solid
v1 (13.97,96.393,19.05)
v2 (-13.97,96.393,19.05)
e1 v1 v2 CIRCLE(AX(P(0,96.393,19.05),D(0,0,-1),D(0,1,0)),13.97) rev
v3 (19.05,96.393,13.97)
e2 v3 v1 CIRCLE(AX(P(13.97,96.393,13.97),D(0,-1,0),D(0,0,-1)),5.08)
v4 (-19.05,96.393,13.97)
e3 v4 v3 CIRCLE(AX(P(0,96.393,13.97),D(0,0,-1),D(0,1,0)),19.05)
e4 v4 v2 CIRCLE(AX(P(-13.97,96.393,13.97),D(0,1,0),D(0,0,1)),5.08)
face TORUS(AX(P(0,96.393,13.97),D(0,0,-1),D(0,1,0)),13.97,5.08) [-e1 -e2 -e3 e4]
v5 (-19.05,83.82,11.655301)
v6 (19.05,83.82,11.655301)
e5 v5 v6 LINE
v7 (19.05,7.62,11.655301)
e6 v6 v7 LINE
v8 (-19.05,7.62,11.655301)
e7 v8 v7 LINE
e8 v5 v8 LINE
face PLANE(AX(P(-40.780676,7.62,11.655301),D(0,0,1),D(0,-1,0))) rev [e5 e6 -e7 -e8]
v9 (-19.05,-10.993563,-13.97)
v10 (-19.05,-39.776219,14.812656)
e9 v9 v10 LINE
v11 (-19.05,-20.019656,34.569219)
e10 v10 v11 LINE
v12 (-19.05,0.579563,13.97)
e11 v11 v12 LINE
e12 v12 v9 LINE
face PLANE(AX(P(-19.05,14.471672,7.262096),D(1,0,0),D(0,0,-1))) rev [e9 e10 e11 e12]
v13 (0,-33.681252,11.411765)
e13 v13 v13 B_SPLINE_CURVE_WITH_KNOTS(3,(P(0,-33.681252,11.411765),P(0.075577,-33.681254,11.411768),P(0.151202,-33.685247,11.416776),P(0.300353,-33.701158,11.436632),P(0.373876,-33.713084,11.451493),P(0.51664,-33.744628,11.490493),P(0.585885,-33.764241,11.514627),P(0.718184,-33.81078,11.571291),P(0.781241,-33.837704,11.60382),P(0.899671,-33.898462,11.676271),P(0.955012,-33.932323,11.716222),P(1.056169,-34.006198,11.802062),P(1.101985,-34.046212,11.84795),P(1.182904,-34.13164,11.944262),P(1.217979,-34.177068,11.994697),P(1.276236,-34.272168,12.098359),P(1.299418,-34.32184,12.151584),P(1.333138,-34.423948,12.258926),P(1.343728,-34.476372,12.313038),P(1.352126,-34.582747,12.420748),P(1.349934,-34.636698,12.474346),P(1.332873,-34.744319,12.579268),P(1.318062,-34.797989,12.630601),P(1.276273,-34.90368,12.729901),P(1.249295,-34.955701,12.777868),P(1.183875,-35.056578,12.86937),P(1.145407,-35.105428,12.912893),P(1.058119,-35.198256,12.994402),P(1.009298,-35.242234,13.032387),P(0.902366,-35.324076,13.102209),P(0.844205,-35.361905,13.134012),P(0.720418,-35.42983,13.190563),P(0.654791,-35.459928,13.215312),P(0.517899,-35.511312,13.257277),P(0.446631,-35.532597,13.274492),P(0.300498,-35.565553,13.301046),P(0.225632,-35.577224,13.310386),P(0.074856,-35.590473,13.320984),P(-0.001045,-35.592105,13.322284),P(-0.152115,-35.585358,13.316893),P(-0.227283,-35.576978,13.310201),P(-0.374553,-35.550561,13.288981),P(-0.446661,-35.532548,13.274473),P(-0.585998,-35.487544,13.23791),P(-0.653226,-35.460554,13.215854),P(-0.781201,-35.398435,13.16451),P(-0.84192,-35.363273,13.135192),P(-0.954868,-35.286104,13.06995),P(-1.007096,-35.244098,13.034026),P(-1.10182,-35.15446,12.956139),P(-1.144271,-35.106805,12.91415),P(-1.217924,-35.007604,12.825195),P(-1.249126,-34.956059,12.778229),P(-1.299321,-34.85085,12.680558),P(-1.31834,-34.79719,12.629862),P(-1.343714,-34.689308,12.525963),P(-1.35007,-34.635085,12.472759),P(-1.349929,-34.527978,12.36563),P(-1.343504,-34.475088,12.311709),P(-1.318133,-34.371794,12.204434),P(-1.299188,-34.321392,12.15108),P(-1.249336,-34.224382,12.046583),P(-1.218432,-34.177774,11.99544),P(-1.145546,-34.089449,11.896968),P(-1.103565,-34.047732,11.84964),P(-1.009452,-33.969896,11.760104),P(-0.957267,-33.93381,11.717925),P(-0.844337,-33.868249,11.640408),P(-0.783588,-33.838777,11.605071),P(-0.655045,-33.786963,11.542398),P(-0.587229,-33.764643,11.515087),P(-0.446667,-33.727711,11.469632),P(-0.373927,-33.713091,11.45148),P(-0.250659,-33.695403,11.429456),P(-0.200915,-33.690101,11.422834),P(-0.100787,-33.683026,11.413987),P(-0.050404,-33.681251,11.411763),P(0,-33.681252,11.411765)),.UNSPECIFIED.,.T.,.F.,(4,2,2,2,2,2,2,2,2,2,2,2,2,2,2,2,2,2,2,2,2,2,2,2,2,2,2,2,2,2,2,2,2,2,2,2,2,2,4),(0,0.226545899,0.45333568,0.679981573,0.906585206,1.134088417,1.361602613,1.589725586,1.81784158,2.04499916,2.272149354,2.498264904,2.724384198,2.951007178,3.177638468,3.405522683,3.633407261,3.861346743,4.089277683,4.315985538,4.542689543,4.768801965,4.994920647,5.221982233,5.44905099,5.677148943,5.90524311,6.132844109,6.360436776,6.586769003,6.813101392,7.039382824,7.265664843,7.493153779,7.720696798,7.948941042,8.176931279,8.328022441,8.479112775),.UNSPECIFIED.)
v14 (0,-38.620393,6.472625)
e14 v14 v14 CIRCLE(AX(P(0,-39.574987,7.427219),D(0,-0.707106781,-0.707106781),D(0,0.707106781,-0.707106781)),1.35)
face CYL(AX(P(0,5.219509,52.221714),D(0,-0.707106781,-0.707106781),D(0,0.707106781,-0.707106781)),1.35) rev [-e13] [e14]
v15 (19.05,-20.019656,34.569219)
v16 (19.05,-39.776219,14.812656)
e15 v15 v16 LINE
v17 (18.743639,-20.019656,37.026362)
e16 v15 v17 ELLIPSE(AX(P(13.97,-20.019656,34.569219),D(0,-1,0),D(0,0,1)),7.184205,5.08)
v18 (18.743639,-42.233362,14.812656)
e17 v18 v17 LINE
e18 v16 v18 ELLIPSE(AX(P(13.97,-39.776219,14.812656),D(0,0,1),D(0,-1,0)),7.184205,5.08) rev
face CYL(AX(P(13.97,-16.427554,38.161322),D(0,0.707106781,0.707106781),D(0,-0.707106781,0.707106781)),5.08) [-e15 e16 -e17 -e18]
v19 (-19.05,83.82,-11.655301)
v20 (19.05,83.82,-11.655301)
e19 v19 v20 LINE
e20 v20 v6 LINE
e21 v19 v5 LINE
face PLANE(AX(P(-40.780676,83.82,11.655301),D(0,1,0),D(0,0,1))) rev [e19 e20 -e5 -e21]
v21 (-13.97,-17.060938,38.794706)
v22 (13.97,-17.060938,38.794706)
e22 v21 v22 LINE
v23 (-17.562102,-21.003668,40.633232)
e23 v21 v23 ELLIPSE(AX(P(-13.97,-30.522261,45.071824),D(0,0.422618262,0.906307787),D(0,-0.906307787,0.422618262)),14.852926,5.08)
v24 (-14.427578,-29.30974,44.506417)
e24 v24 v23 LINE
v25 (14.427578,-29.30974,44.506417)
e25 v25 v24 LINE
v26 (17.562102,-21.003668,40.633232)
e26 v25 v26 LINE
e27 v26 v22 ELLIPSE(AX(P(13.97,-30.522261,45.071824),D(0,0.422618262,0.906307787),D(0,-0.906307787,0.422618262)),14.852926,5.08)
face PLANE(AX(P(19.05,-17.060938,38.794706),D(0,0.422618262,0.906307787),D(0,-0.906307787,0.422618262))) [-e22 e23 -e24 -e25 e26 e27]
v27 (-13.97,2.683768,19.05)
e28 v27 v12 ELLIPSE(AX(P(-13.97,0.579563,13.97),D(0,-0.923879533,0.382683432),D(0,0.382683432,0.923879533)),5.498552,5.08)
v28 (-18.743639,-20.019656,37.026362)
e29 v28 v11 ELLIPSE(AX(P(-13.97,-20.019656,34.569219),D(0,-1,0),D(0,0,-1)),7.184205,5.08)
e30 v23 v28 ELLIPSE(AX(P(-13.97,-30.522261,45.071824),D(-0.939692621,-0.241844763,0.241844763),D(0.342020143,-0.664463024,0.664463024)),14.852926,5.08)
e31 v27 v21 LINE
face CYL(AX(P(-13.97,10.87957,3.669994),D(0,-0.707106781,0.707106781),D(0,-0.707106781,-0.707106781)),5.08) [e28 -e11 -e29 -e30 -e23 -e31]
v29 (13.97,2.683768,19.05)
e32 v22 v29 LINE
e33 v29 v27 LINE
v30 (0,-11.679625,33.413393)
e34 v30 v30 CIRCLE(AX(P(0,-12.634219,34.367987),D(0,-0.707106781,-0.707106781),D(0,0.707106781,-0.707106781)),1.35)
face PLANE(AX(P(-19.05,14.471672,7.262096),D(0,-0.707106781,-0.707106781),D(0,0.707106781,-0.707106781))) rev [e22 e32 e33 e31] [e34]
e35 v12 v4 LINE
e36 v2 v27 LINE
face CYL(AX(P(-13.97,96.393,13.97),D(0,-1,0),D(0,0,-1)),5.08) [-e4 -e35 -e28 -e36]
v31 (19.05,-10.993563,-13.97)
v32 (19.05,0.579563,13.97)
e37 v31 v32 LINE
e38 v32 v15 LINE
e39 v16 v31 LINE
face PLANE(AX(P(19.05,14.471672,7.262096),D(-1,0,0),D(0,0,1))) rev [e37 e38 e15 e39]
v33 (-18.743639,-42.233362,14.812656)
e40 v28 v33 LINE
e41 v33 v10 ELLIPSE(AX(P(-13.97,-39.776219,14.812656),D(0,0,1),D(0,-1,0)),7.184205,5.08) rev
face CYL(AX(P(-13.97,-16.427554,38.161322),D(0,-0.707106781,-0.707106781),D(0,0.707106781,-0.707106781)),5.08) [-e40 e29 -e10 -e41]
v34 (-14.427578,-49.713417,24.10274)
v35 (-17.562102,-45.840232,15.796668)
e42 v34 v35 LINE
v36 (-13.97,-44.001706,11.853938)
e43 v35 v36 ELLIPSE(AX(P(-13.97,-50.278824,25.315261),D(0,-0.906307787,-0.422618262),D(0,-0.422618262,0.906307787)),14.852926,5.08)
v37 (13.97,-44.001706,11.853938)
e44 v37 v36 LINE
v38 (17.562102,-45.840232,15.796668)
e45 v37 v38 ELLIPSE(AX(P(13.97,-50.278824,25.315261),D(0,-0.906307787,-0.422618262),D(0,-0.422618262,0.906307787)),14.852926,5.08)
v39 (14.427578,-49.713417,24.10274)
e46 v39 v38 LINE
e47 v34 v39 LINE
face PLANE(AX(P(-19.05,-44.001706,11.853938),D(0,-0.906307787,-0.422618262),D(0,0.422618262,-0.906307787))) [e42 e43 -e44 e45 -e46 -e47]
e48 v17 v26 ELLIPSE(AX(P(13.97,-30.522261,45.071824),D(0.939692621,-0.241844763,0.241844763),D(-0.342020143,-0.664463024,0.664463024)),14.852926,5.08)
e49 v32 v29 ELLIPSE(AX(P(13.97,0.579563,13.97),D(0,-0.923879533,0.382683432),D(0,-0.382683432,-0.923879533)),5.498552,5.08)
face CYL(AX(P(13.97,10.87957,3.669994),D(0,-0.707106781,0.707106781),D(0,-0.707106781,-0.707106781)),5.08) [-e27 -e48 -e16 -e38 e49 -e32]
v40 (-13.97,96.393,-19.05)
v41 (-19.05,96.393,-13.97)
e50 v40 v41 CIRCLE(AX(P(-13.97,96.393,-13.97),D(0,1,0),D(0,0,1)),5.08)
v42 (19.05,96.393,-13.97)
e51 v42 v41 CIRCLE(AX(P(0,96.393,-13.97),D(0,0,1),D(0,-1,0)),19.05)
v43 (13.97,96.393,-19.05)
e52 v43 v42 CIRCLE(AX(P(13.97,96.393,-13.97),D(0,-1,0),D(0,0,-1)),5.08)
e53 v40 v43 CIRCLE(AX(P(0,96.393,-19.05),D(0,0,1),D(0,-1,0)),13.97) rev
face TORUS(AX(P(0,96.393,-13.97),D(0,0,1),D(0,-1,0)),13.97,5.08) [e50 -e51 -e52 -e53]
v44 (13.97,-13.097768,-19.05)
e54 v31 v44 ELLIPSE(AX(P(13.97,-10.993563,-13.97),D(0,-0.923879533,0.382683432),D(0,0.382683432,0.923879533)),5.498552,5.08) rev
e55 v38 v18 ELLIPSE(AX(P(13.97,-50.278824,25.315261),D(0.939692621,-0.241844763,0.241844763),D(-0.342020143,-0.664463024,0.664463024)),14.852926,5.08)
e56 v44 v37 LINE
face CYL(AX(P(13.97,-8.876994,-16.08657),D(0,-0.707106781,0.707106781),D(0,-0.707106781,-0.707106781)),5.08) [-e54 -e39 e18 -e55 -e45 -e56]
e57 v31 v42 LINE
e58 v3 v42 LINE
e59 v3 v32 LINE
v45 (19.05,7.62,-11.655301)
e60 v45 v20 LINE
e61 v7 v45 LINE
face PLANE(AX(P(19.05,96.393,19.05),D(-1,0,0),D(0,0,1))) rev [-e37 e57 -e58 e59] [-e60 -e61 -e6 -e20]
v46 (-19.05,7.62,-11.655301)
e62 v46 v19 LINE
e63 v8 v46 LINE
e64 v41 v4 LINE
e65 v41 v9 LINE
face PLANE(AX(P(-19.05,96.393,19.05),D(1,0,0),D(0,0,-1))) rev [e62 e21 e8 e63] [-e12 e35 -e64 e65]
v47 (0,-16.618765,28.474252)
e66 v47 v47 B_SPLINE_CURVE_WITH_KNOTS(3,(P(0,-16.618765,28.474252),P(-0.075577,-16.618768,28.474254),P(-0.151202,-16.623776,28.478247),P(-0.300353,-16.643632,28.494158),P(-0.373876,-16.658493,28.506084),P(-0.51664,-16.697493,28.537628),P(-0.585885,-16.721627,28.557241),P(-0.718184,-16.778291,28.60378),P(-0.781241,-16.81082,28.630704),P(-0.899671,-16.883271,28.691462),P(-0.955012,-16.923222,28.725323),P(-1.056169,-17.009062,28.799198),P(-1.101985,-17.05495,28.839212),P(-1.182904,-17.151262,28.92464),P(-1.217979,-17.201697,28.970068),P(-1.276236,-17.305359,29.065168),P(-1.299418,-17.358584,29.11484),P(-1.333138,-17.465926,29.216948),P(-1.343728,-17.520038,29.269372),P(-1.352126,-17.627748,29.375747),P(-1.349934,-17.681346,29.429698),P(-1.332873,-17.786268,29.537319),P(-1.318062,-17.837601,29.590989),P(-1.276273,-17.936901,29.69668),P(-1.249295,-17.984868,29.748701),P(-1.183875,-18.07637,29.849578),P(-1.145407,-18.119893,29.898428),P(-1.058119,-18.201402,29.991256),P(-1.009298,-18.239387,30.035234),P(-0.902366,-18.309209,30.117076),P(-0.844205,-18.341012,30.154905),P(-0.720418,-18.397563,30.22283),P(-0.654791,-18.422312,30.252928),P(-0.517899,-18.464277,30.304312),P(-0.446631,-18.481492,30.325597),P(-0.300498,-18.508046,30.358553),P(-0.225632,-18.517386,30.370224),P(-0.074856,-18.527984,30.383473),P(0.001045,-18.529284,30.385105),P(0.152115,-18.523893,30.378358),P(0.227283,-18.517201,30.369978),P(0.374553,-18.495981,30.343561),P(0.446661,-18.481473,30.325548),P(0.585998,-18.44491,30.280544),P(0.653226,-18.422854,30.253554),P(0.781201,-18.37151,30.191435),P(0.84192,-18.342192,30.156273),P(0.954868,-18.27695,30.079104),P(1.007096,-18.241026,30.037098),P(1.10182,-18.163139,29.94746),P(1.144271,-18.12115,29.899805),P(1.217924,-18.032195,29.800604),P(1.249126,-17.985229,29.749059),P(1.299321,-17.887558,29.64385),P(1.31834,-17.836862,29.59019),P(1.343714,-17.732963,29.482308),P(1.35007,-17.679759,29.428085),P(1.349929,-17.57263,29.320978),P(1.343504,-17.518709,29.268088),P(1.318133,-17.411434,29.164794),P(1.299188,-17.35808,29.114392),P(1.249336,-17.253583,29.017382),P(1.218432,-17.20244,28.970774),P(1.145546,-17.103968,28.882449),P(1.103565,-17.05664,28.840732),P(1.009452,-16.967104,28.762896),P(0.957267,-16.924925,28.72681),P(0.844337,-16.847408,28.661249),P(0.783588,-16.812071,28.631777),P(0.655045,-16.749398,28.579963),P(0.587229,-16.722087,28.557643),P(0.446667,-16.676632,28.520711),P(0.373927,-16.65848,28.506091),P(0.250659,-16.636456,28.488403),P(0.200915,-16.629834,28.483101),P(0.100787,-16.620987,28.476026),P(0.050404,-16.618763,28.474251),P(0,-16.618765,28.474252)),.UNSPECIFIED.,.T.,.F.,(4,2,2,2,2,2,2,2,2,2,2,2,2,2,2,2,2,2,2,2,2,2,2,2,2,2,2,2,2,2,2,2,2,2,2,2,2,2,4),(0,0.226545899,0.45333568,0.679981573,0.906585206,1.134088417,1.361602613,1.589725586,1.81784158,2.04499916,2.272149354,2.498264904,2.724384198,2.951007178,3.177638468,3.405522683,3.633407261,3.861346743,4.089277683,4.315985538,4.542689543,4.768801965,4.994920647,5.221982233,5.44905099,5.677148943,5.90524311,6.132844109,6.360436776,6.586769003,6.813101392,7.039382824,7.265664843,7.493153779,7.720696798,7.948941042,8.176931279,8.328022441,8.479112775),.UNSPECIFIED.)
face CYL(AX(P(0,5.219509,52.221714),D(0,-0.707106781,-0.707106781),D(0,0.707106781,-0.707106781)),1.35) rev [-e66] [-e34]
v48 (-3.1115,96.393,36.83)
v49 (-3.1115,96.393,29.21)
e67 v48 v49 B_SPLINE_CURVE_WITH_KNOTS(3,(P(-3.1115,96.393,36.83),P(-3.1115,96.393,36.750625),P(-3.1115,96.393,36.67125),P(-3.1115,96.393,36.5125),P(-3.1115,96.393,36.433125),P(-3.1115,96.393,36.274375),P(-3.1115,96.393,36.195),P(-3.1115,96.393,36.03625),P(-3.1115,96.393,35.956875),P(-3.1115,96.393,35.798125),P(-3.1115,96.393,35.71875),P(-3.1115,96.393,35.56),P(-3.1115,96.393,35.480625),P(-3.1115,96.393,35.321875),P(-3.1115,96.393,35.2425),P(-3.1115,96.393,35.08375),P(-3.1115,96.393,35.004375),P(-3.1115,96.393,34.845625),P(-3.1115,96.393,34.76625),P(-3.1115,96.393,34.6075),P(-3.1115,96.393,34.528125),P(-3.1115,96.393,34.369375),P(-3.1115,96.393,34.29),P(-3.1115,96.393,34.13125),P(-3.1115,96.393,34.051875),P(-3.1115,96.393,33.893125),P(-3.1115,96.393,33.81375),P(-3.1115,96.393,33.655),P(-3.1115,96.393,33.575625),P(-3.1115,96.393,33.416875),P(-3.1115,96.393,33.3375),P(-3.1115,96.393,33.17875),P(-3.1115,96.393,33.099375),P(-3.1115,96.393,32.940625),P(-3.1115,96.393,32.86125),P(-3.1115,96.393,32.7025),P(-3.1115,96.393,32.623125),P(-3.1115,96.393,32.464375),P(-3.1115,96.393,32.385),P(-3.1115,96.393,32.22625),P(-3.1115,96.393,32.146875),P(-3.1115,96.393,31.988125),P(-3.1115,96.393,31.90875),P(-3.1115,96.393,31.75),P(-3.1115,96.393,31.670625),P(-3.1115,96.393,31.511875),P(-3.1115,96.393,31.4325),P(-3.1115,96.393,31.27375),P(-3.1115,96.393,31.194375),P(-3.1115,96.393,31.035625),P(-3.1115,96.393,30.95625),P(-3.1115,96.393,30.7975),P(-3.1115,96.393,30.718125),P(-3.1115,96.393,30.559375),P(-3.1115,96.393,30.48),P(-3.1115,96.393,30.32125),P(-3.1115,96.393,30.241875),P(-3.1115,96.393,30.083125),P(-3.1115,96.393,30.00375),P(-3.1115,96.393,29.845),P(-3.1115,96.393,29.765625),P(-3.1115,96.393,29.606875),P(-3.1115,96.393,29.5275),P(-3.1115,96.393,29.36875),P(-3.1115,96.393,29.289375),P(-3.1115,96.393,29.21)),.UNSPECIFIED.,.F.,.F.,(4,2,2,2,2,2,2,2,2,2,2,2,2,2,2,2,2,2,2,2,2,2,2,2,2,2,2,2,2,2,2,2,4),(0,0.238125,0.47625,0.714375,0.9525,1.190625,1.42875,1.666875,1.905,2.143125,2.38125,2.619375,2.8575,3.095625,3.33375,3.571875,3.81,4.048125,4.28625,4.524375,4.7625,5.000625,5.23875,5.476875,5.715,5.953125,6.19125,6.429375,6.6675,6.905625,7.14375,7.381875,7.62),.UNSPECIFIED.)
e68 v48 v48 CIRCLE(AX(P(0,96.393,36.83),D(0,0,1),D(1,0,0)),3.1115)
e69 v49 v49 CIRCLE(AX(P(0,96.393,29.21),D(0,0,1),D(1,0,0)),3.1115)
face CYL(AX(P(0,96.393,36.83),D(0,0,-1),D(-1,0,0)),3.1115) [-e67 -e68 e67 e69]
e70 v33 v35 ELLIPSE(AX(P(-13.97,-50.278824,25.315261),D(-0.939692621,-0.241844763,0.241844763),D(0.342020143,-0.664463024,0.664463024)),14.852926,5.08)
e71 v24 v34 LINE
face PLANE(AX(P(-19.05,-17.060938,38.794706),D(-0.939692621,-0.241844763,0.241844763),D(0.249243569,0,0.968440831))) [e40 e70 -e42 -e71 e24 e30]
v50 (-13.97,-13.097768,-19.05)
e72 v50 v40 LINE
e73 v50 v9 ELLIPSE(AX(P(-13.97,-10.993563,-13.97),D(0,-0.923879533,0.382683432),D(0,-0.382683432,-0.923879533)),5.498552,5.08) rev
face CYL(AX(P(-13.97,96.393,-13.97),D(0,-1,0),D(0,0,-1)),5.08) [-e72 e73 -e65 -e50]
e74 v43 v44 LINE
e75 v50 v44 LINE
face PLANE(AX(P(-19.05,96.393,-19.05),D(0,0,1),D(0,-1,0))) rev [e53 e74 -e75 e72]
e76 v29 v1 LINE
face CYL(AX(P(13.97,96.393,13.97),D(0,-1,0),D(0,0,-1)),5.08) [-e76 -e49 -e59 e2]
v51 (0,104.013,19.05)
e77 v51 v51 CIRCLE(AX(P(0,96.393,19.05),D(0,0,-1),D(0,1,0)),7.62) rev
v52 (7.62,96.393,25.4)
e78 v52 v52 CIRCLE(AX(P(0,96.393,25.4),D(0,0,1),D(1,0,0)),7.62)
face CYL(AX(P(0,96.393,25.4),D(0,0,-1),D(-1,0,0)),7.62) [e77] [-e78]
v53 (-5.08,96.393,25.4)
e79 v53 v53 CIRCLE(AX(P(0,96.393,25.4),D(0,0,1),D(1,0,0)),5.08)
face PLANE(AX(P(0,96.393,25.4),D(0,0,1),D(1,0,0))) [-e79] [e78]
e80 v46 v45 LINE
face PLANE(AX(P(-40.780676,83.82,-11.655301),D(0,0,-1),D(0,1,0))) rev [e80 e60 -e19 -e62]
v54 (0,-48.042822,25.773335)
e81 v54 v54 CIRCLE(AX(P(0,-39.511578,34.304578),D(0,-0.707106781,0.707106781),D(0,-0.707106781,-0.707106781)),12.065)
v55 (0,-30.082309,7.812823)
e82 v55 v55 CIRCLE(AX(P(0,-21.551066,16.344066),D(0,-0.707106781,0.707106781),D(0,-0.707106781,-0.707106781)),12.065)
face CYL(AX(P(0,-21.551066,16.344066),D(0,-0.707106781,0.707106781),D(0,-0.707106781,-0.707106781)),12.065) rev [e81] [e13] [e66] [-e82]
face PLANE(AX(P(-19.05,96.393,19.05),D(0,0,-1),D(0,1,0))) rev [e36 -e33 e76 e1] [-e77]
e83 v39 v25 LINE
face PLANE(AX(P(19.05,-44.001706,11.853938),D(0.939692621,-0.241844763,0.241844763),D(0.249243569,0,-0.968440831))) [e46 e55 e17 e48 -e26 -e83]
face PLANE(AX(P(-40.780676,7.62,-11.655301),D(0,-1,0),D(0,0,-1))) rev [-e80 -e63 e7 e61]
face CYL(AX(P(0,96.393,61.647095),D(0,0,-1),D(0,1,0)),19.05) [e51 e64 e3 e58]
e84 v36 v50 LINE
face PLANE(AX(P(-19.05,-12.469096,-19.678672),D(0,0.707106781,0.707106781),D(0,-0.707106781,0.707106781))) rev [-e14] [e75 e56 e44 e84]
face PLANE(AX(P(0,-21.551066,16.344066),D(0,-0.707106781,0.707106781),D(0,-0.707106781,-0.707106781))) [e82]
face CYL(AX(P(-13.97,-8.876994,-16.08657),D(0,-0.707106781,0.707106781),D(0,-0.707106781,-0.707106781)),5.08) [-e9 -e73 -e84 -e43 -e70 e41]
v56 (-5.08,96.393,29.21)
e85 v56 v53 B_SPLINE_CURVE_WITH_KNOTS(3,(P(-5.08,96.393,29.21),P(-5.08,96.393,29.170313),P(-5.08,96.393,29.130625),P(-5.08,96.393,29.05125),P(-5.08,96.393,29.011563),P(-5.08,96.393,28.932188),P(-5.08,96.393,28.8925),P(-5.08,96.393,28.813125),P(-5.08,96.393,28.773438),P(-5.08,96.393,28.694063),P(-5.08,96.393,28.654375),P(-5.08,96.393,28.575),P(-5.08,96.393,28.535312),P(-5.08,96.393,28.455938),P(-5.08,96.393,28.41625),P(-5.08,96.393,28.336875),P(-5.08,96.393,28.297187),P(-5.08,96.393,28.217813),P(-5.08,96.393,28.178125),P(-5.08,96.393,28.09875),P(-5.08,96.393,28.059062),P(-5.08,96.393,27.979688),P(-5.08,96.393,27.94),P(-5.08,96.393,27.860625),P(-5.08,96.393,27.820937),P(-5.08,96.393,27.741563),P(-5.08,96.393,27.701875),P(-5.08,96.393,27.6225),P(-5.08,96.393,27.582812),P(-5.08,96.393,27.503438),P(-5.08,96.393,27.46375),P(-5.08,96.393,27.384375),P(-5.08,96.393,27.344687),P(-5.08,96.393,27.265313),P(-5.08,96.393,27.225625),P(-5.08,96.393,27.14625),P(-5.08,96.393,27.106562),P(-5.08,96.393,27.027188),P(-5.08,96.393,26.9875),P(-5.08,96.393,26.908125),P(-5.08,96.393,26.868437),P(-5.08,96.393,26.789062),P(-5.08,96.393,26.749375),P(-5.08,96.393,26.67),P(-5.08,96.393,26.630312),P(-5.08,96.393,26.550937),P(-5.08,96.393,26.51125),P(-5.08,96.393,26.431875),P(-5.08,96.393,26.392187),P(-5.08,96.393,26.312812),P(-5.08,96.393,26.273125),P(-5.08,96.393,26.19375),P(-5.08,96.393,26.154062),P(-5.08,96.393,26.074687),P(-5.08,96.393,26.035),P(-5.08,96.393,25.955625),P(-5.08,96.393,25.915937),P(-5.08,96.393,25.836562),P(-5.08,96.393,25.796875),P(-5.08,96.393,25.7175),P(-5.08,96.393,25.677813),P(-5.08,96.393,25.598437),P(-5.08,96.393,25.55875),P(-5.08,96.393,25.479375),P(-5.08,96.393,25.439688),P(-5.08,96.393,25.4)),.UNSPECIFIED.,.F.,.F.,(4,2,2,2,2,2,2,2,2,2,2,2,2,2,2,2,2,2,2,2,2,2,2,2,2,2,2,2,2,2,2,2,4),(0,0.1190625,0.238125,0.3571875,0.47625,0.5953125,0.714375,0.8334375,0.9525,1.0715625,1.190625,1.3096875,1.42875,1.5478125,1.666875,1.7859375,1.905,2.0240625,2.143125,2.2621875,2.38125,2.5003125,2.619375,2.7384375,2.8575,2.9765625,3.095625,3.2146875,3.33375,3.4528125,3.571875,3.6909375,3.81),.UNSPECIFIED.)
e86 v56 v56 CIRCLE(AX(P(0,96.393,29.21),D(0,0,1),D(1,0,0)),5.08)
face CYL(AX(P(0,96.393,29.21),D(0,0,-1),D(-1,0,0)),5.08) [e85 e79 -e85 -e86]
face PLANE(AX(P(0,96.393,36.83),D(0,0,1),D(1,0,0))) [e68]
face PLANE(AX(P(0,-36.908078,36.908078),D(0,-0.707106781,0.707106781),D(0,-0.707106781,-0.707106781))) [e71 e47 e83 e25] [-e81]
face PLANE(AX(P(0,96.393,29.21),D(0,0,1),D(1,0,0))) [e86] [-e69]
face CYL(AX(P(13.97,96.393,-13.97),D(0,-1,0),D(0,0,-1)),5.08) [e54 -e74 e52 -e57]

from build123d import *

# Parameters (mm, degrees)
SKETCH11_W          = 38.1
SKETCH11_H          = 38.1
SKETCH12_W          = 38.1
SKETCH12_H          = 38.1
BOSS_EXTRUDE5_DEPTH = 12.7
BOSS_EXTRUDE5_TAPER = 20
BOSS_EXTRUDE6_DEPTH = 38.1
SKETCH15_R          = 12.065
CUT_EXTRUDE3_DEPTH  = 25.4
SKETCH16_W          = 23.310601064
SKETCH16_H          = 76.2
CUT_EXTRUDE4_DEPTH  = 59.830675793
SKETCH17_R          = 7.62
BOSS_EXTRUDE7_DEPTH = 6.35
SKETCH18_R          = 5.08
BOSS_EXTRUDE8_DEPTH = 3.81
SKETCH19_R          = 3.1115
BOSS_EXTRUDE9_DEPTH = 7.62
FILLET2_R           = 5.08
SKETCH21_R          = 1.35
CUT_EXTRUDE5_DEPTH  = 63.348983198


with BuildPart() as part:
    # Sweep1: sweep along a path in Sketch10
    with BuildLine(Plane(origin=(0, 0, 0), x_dir=(0, 0, -1), z_dir=(1, 0, 0))) as sweep1_path:
        Line((0, 96.393), (0, -5.207))
        Line((0, -5.207), (-25.324322261, -30.531322261))
    # Sketch11 → Sweep1 (sweep)
    with BuildSketch(Plane(origin=(0, 96.393, 0), x_dir=(1, 0, 0), z_dir=(0, 1, 0))):
        Rectangle(SKETCH11_W, SKETCH11_H)
    sweep(path=sweep1_path.line, transition=Transition.RIGHT)

    # Sketch12 → Boss-Extrude5 (add)
    with BuildSketch(Plane(origin=(0, -27.927822261, 27.927822261), x_dir=(1, 0, 0), z_dir=(0, -0.7071067811865461, 0.7071067811865489))):
        with Locations((0, -3.68190501)):
            Rectangle(SKETCH12_W, SKETCH12_H)
    extrude(amount=BOSS_EXTRUDE5_DEPTH, taper=BOSS_EXTRUDE5_TAPER)

    # Sketch13 → Boss-Extrude6 (add)
    with BuildSketch(Plane(origin=(0, 0, -19.05), x_dir=(-1, 0, 0), z_dir=(0, 0, -1))):
        with BuildLine():
            Line((-19.05, 96.393), (19.05, 96.393))
            ThreePointArc((19.05, 96.393), (0, 115.443), (-19.05, 96.393))
        make_face()
    extrude(amount=-BOSS_EXTRUDE6_DEPTH)

    # Sketch15 → Cut-Extrude3 (cut)
    with BuildSketch(Plane(origin=(0, -36.908078382, 36.908078382), x_dir=(1, 0, 0), z_dir=(0, -0.7071067811865461, 0.7071067811865489))):
        with Locations(Location((0, -3.68190501, 0), (0, 0, 270))):
            Circle(SKETCH15_R)
    extrude(amount=-CUT_EXTRUDE3_DEPTH, mode=Mode.SUBTRACT)

    # Sketch16 → Cut-Extrude4 (cut)
    with BuildSketch(Plane(origin=(19.05, 0, 0), x_dir=(0, 0, -1), z_dir=(1, 0, 0))):
        with Locations((0, 45.72)):
            Rectangle(SKETCH16_W, SKETCH16_H)
    extrude(amount=-CUT_EXTRUDE4_DEPTH, mode=Mode.SUBTRACT)

    # Sketch17 → Boss-Extrude7 (add)
    with BuildSketch(Plane.XY.offset(19.05)):
        with Locations(Location((0, 96.393, 0), (0, 0, 90))):
            Circle(SKETCH17_R)
    extrude(amount=BOSS_EXTRUDE7_DEPTH)

    # Sketch18 → Boss-Extrude8 (add)
    with BuildSketch(Plane.XY.offset(25.4)):
        with Locations(Location((0, 96.393, 0), (0, 0, 180))):
            Circle(SKETCH18_R)
    extrude(amount=BOSS_EXTRUDE8_DEPTH)

    # Sketch19 → Boss-Extrude9 (add)
    with BuildSketch(Plane.XY.offset(29.21)):
        with Locations(Location((0, 96.393, 0), (0, 0, 180))):
            Circle(SKETCH19_R)
    extrude(amount=BOSS_EXTRUDE9_DEPTH)

    # Fillet2
    # the kernel refuses this fillet: 5.08 mm, written as the material it takes off along each edge
    with BuildSketch(Plane(origin=(19.05, 96.393, 19.05), x_dir=(-1, 0, 0), z_dir=(0, -1, 0))) as fillet2_piece_1_section:
        with BuildLine():
            CenterArc((FILLET2_R, FILLET2_R), FILLET2_R, 180, 90)
            Line((0, FILLET2_R), (0, 0))
            Line((0, 0), (FILLET2_R, 0))
        make_face()
    fillet2_piece_1 = extrude(amount=106.409231637, mode=Mode.PRIVATE)
    fillet2_piece_1 = split(fillet2_piece_1, bisect_by=Plane(origin=(17.892257619, 26.96392305, -5.230154687), z_dir=(0, 0.7071067811865489, 0.7071067811865462)), keep=Keep.TOP, mode=Mode.PRIVATE)
    add(fillet2_piece_1, mode=Mode.SUBTRACT)
    with BuildSketch(Plane(origin=(19.05, 96.393, -19.05), x_dir=(0, 0, 1), z_dir=(0, -1, 0))) as fillet2_piece_2:
        with BuildLine():
            CenterArc((FILLET2_R, FILLET2_R), FILLET2_R, 180, 90)
            Line((0, FILLET2_R), (0, 0))
            Line((0, 0), (FILLET2_R, 0))
        make_face()
    extrude(amount=122.190768363, mode=Mode.SUBTRACT)
    with BuildSketch(Plane(origin=(19.05, 11.664024484, 10.069743879), x_dir=(-1, 0, 0), z_dir=(0, -0.7071067811865462, 0.7071067811865489))) as fillet2_piece_3_section:
        with BuildLine():
            CenterArc((FILLET2_R, FILLET2_R), FILLET2_R, 180, 90)
            Line((0, FILLET2_R), (0, 0))
            Line((0, 0), (FILLET2_R, 0))
        make_face()
    fillet2_piece_3 = extrude(amount=53.323231637, mode=Mode.PRIVATE)
    fillet2_piece_3 = split(fillet2_piece_3, bisect_by=Plane(origin=(17.881962417, -12.866336341, 19.05), z_dir=(0, 0, 1)), keep=Keep.TOP, mode=Mode.PRIVATE)
    add(fillet2_piece_3, mode=Mode.SUBTRACT)
    with BuildSketch(Plane(origin=(19.05, -4.117512242, -28.030256121), x_dir=(0, 0.7071067811865489, 0.7071067811865462), z_dir=(0, -0.7071067811865462, 0.7071067811865489))) as fillet2_piece_4:
        with BuildLine():
            CenterArc((FILLET2_R, FILLET2_R), FILLET2_R, 180, 90)
            Line((0, FILLET2_R), (0, 0))
            Line((0, 0), (FILLET2_R, 0))
        make_face()
    extrude(amount=69.104768363, mode=Mode.SUBTRACT)
    with BuildSketch(Plane(origin=(-19.05, -4.117512242, -28.030256121), x_dir=(0, 0.7071067811865488, 0.7071067811865461), z_dir=(0, -0.7071067811865462, 0.7071067811865489))) as fillet2_piece_5:
        with BuildLine():
            CenterArc((FILLET2_R, -FILLET2_R), FILLET2_R, 90, 90)
            Line((0, -FILLET2_R), (0, 0))
            Line((0, 0), (FILLET2_R, 0))
        make_face()
    extrude(amount=69.104768363, mode=Mode.SUBTRACT)
    with BuildSketch(Plane(origin=(-19.05, 11.664024484, 10.069743879), x_dir=(0, -0.7071067811865489, -0.7071067811865462), z_dir=(0, -0.7071067811865462, 0.7071067811865489))) as fillet2_piece_6_section:
        with BuildLine():
            CenterArc((FILLET2_R, FILLET2_R), FILLET2_R, 180, 90)
            Line((0, FILLET2_R), (0, 0))
            Line((0, 0), (FILLET2_R, 0))
        make_face()
    fillet2_piece_6 = extrude(amount=53.323231637, mode=Mode.PRIVATE)
    fillet2_piece_6 = split(fillet2_piece_6, bisect_by=Plane(origin=(-17.881962417, -12.866336341, 19.05), z_dir=(0, 0, 1)), keep=Keep.TOP, mode=Mode.PRIVATE)
    add(fillet2_piece_6, mode=Mode.SUBTRACT)
    with BuildSketch(Plane(origin=(19.05, -15.477476632, 40.378167891), x_dir=(0, 0.7071067811865461, -0.7071067811865488), z_dir=(0, -0.7071067811865489, -0.7071067811865462)), Plane(origin=(-19.05, -45.585167891, 10.270476632), x_dir=(0, 0.7071067811865461, -0.7071067811865489), z_dir=(0, 0.7071067811865489, 0.7071067811865462))) as fillet2_piece_7:
        with BuildLine():
            CenterArc((FILLET2_R * 0.176326980708, -FILLET2_R), FILLET2_R, 90, 20)
            Line((-FILLET2_R * 0.165693162617, -FILLET2_R * 0.0603073792141), (0, 0))
            Line((0, 0), (FILLET2_R * 0.176326980708, 0))
        make_face()
    extrude(amount=42.57870531, mode=Mode.SUBTRACT)
    with BuildSketch(Plane(origin=(-19.05, 96.393, -19.05), x_dir=(0, 0, 1), z_dir=(0, -1, 0))) as fillet2_piece_8:
        with BuildLine():
            CenterArc((FILLET2_R, -FILLET2_R), FILLET2_R, 90, 90)
            Line((0, -FILLET2_R), (0, 0))
            Line((0, 0), (FILLET2_R, 0))
        make_face()
    extrude(amount=122.190768363, mode=Mode.SUBTRACT)
    with BuildSketch(Plane(origin=(-19.05, 96.393, 19.05), x_dir=(1, 0, 0), z_dir=(0, -1, 0))) as fillet2_piece_9_section:
        with BuildLine():
            CenterArc((FILLET2_R, -FILLET2_R), FILLET2_R, 90, 90)
            Line((0, -FILLET2_R), (0, 0))
            Line((0, 0), (FILLET2_R, 0))
        make_face()
    fillet2_piece_9 = extrude(amount=106.409231637, mode=Mode.PRIVATE)
    fillet2_piece_9 = split(fillet2_piece_9, bisect_by=Plane(origin=(-17.892257619, 26.96392305, -5.230154687), z_dir=(0, 0.7071067811865489, 0.7071067811865462)), keep=Keep.TOP, mode=Mode.PRIVATE)
    add(fillet2_piece_9, mode=Mode.SUBTRACT)
    with BuildSketch(Plane(origin=(0, 96.393, -19.05), x_dir=(-1, 0, 0), z_dir=(0, -1, 0))) as fillet2_piece_10:
        with BuildLine():
            CenterArc((19.05 - FILLET2_R, -FILLET2_R), FILLET2_R, 0, 90)
            Line((19.05 - FILLET2_R, 0), (19.05, 0))
            Line((19.05, 0), (19.05, -FILLET2_R))
        make_face()
    revolve(axis=Axis((0, 96.393, -19.05), (0, 0, -1)), revolution_arc=180, mode=Mode.SUBTRACT)
    with BuildSketch(Plane(origin=(0, 96.393, 19.05), x_dir=(-1, 0, 0), z_dir=(0, -1, 0))) as fillet2_piece_11:
        with BuildLine():
            CenterArc((19.05 - FILLET2_R, FILLET2_R), FILLET2_R, 270, 90)
            Line((19.05, FILLET2_R), (19.05, 0))
            Line((19.05, 0), (19.05 - FILLET2_R, 0))
        make_face()
    revolve(axis=Axis((0, 96.393, 19.05), (0, 0, -1)), revolution_arc=180, mode=Mode.SUBTRACT)
    with BuildSketch(Plane(origin=(19.05, 96.393, 19.05), x_dir=(-1, 0, 0), z_dir=(0, -1, 0))) as fillet2_piece_12a_section:
        with BuildLine():
            CenterArc((FILLET2_R, FILLET2_R), FILLET2_R, 180, 90)
            Line((0, FILLET2_R), (0, 0))
            Line((0, 0), (FILLET2_R, 0))
        make_face()
    fillet2_piece_12a = extrude(amount=106.409231637, mode=Mode.PRIVATE)
    fillet2_piece_12a = split(fillet2_piece_12a, bisect_by=Plane(origin=(17.951071981, 0.436282509, 21.297485854), z_dir=(0, -0.7071067811865489, -0.7071067811865462)), keep=Keep.TOP, mode=Mode.PRIVATE)
    with BuildSketch(Plane(origin=(19.05, 11.664024484, 10.069743879), x_dir=(-1, 0, 0), z_dir=(0, -0.7071067811865462, 0.7071067811865489))) as fillet2_piece_12b_section:
        with BuildLine():
            CenterArc((FILLET2_R, FILLET2_R), FILLET2_R, 180, 90)
            Line((0, FILLET2_R), (0, 0))
            Line((0, 0), (FILLET2_R, 0))
        make_face()
    fillet2_piece_12b = extrude(amount=53.323231637, mode=Mode.PRIVATE)
    fillet2_piece_12b = split(fillet2_piece_12b, bisect_by=Plane(origin=(17.951071981, 5.862193339, 19.05), z_dir=(0, 0, -1)), keep=Keep.TOP, mode=Mode.PRIVATE)
    fillet2_piece_12 = fillet2_piece_12a & fillet2_piece_12b
    add(fillet2_piece_12, mode=Mode.SUBTRACT)
    with BuildSketch(Plane(origin=(-19.05, 96.393, 19.05), x_dir=(1, 0, 0), z_dir=(0, -1, 0))) as fillet2_piece_13a_section:
        with BuildLine():
            CenterArc((FILLET2_R, -FILLET2_R), FILLET2_R, 90, 90)
            Line((0, -FILLET2_R), (0, 0))
            Line((0, 0), (FILLET2_R, 0))
        make_face()
    fillet2_piece_13a = extrude(amount=106.409231637, mode=Mode.PRIVATE)
    fillet2_piece_13a = split(fillet2_piece_13a, bisect_by=Plane(origin=(-17.951071981, 0.436282509, 21.297485854), z_dir=(0, -0.7071067811865489, -0.7071067811865462)), keep=Keep.TOP, mode=Mode.PRIVATE)
    with BuildSketch(Plane(origin=(-19.05, 11.664024484, 10.069743879), x_dir=(0, -0.7071067811865489, -0.7071067811865462), z_dir=(0, -0.7071067811865462, 0.7071067811865489))) as fillet2_piece_13b_section:
        with BuildLine():
            CenterArc((FILLET2_R, FILLET2_R), FILLET2_R, 180, 90)
            Line((0, FILLET2_R), (0, 0))
            Line((0, 0), (FILLET2_R, 0))
        make_face()
    fillet2_piece_13b = extrude(amount=53.323231637, mode=Mode.PRIVATE)
    fillet2_piece_13b = split(fillet2_piece_13b, bisect_by=Plane(origin=(-17.951071981, 5.862193339, 19.05), z_dir=(0, 0, -1)), keep=Keep.TOP, mode=Mode.PRIVATE)
    fillet2_piece_13 = fillet2_piece_13a & fillet2_piece_13b
    add(fillet2_piece_13, mode=Mode.SUBTRACT)

    # Sketch21 → Cut-Extrude5 (cut)
    with BuildSketch(Plane(origin=(0, -16.073884182, -16.073884182), x_dir=(1, 0, 0), z_dir=(0, -0.7071067811865486, -0.7071067811865465))):
        with Locations(Location((0, 33.23557837, 0), (0, 0, 270))):
            Circle(SKETCH21_R)
    extrude(amount=-CUT_EXTRUDE5_DEPTH, mode=Mode.SUBTRACT)


solid = part.part
